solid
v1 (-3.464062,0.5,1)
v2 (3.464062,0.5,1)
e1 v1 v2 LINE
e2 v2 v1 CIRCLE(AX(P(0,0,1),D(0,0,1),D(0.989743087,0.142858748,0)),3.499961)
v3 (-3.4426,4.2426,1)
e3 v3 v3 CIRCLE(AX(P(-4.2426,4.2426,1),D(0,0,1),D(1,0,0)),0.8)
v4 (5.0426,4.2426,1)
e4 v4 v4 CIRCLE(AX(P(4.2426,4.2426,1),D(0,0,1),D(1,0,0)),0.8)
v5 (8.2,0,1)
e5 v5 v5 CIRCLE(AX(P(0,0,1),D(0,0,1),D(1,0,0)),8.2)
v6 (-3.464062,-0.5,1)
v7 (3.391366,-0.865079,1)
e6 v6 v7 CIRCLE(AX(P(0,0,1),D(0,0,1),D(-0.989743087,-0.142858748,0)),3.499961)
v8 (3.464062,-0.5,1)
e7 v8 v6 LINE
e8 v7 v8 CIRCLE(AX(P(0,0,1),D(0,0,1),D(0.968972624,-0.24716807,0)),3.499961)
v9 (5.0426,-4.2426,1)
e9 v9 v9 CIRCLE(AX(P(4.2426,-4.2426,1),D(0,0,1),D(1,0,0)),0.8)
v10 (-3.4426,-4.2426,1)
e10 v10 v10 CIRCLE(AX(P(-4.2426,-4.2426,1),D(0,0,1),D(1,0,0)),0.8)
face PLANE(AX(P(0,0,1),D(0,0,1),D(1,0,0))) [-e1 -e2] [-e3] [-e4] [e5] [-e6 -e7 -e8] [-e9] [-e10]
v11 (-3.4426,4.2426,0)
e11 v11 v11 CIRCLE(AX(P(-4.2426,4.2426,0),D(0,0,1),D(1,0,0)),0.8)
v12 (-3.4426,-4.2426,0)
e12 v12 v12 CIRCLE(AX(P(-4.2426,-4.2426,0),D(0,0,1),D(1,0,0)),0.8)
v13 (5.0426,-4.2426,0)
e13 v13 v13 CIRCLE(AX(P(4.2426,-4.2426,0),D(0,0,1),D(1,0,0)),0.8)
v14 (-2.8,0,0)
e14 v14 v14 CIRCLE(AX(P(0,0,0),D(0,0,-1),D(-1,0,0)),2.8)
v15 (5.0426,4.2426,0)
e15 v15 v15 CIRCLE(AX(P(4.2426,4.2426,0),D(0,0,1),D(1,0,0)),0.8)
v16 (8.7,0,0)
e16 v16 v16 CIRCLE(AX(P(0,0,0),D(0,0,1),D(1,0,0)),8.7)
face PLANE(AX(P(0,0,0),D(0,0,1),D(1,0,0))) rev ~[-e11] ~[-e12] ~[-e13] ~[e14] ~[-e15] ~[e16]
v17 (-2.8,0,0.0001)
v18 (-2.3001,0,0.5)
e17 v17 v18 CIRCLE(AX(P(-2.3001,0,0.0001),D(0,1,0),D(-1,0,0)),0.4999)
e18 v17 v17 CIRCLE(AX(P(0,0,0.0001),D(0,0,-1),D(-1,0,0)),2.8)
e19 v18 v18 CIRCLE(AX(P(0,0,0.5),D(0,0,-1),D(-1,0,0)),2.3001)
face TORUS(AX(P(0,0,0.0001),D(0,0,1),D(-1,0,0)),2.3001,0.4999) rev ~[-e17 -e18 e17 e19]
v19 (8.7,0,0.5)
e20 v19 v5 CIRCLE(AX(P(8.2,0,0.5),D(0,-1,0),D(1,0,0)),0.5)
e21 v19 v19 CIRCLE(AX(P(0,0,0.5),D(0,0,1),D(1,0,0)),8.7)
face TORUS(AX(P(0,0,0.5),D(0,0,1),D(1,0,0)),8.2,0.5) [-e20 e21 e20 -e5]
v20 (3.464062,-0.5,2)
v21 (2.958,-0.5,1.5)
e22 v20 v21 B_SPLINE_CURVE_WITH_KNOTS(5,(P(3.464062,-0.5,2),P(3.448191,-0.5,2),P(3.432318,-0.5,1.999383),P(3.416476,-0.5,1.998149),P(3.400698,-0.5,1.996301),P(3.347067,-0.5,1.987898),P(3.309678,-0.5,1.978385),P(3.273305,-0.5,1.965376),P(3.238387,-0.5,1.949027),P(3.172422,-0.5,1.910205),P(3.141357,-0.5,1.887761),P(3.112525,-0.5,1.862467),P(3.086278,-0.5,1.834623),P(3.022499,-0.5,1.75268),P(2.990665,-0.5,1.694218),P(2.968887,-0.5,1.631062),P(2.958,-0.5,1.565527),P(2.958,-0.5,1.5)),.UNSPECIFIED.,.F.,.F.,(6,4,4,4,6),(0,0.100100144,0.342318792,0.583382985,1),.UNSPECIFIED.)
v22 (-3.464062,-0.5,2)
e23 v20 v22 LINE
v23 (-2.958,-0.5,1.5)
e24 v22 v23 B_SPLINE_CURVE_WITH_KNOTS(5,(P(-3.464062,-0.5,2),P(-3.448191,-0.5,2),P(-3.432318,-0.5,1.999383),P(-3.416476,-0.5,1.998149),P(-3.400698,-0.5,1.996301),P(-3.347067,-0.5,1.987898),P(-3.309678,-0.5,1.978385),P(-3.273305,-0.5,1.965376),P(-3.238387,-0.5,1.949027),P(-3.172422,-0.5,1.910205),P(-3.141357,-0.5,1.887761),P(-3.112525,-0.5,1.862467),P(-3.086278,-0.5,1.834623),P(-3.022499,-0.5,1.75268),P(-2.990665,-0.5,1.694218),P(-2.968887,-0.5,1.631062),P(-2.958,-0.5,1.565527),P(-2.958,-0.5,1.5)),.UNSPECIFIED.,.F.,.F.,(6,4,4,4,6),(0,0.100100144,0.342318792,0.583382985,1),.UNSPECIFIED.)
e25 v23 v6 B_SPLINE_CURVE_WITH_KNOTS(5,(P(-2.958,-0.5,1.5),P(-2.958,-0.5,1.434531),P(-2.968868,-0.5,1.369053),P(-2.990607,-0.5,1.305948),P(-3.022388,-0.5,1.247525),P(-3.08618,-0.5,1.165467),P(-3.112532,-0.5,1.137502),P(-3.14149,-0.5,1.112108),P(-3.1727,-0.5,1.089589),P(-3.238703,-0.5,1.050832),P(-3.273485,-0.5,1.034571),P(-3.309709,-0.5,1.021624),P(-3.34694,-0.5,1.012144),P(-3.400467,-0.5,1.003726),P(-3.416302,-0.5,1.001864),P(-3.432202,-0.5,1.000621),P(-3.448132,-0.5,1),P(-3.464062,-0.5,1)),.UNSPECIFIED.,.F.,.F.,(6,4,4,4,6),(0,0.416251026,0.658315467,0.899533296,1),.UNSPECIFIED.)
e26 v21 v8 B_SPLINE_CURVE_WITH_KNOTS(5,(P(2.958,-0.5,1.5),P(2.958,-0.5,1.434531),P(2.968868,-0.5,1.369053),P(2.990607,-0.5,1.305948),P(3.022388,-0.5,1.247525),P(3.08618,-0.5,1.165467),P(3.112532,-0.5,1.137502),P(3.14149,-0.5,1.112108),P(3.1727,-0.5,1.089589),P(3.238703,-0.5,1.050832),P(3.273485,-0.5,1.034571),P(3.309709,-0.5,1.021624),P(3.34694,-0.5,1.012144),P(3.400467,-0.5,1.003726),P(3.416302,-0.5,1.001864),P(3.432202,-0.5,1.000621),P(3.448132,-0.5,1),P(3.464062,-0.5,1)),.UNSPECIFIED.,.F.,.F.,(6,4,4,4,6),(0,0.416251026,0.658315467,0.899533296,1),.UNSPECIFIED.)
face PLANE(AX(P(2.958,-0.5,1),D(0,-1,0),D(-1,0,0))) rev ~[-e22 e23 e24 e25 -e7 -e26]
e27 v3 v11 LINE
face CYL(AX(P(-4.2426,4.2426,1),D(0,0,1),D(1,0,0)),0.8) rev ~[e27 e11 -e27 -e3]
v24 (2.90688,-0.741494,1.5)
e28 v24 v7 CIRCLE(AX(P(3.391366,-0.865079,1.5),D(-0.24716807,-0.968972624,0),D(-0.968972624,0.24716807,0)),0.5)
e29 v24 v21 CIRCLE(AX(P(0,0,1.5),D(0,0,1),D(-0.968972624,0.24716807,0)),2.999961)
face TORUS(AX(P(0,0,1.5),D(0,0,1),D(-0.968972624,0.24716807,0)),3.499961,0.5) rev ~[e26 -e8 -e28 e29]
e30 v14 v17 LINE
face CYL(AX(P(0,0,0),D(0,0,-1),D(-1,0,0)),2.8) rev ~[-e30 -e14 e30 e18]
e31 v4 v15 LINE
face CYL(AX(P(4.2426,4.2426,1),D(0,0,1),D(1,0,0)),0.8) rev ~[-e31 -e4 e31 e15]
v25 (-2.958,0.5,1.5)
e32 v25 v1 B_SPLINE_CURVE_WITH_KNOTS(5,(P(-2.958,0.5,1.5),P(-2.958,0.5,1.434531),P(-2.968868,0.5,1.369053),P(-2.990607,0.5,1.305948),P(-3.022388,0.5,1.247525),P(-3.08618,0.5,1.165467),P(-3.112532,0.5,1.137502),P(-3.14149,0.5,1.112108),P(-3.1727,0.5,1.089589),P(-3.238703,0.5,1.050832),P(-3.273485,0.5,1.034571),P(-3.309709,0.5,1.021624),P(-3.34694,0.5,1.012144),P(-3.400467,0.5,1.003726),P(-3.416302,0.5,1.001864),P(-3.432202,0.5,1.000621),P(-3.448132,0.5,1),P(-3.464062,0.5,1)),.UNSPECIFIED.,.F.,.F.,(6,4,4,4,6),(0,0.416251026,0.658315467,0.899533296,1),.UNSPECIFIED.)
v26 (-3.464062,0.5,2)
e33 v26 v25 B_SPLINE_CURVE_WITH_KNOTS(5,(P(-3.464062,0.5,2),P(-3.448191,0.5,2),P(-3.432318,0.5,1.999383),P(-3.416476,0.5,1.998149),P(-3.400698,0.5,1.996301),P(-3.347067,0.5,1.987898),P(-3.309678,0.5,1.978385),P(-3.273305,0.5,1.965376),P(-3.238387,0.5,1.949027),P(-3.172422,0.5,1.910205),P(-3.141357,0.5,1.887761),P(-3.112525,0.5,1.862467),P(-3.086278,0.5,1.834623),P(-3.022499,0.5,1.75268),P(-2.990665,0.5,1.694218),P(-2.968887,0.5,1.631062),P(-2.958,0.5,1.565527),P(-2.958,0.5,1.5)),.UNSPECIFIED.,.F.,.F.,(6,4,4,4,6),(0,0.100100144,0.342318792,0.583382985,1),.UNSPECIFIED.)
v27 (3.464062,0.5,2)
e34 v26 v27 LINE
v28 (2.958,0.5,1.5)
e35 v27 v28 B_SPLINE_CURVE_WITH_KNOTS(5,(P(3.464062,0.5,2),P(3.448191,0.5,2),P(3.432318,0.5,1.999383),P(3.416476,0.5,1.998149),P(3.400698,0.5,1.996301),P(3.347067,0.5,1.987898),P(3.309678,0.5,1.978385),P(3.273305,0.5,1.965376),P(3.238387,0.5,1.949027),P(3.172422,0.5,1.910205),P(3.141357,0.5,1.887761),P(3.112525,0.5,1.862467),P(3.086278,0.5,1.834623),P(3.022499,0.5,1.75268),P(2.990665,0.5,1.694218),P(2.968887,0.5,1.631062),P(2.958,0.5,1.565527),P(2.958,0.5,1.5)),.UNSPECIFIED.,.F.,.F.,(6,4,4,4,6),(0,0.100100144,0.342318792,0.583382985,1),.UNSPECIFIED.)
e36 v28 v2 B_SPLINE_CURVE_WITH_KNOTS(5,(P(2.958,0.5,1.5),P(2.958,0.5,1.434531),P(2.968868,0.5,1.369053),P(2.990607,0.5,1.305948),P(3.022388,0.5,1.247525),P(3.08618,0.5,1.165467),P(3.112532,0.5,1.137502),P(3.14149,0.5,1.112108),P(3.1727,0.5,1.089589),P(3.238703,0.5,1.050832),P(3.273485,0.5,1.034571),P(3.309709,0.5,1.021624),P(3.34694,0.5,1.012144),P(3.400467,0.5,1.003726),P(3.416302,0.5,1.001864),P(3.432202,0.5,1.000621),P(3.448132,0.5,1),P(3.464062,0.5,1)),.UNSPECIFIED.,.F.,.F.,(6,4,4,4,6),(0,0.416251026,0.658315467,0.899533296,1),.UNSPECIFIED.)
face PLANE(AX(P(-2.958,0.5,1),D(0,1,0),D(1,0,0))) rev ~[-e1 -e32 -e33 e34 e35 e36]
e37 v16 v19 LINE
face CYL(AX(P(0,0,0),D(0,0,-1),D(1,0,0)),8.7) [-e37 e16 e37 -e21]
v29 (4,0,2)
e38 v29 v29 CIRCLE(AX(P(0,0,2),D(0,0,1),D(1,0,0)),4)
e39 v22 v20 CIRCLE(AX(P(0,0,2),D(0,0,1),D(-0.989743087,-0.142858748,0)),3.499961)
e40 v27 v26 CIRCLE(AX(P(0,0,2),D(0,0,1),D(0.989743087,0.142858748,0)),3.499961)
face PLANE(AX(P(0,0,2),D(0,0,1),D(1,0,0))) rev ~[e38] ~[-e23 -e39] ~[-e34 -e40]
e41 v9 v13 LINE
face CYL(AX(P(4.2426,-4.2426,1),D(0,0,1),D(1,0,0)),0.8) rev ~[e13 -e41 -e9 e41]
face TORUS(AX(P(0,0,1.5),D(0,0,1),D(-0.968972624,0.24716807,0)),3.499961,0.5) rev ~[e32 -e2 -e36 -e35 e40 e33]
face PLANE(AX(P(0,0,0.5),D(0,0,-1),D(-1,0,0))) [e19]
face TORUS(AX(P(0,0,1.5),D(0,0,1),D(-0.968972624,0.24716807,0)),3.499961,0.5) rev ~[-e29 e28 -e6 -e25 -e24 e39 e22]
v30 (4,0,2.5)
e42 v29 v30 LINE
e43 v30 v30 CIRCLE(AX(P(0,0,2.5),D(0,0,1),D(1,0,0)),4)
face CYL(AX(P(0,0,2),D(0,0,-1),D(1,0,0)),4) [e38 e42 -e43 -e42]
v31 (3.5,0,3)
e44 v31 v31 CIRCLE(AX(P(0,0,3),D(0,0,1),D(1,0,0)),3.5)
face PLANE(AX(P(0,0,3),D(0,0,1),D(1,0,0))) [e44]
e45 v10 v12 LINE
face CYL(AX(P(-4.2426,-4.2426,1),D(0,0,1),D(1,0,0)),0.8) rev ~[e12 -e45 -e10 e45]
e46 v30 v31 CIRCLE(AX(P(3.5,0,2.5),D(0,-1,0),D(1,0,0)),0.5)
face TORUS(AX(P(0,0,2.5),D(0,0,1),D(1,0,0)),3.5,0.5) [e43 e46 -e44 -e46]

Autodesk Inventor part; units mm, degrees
ref_plane "YZ Plane" through (0, 0, 0) normal (1, 0, 0) x (0, 1, 0)
ref_plane "XZ Plane" through (0, 0, 0) normal (0, 1, 0) x (-1, 0, 0)
ref_plane "XY Plane" through (0, 0, 0) normal (0, 0, 1) x (1, 0, 0)
sketch "Sketch1" plane through (0, 0, 0) normal (0, 0, 1) x (1, 0, 0)
  circle A0 centre (0, 0) radius 8.7
  dimension "d0" = 17.4
extrude "Extrusion1" add sketch "Sketch1" along normal blind 1
sketch "Sketch2" plane through (0, 0, 1) normal (0, 0, 1) x (1, 0, 0)
  circle A0 centre (4.2426, 4.2426) radius 0.8
  circle A1 centre (-4.2426, 4.2426) radius 0.8
  circle A2 centre (-4.2426, -4.2426) radius 0.8
  circle A3 centre (4.2426, -4.2426) radius 0.8
  dimension "d9" = 1.6
  dimension "d10" = 1.6
  dimension "d11" = 1.6
  dimension "d12" = 1.6
extrude "Extrusion2" cut sketch "Sketch2" against normal up to next
sketch "Sketch3" plane through (0, 0, 0) normal (0, 0, -1) x (-1, 0, 0)
  circle A0 centre (0, 0) radius 2.8
  dimension "d15" = 5.6
extrude "Extrusion3" cut sketch "Sketch3" against normal blind 0.5
fillet "Fillet1" radius 0.5 1 edges at (2.8, 0, 0.5)
fillet "Fillet4" radius 0.5 1 edges at (-8.7, 0, 1)
sketch "Sketch7" plane through (0, 0, 1) normal (0, 0, 1) x (1, 0, 0)
  line L0 (-2.958, 0.5) -> (2.958, 0.5)
  line L1 (2.958, -0.5) -> (-2.958, -0.5)
  arc A0 (2.958, 0.5) -> (-2.958, 0.5) centre (0, 0) ccw
  arc A1 (-2.958, -0.5) -> (2.958, -0.5) centre (0, 0) ccw
  point P0 (0, 0)
extrude "Extrusion7" add sketch "Sketch7" along normal blind 1
sketch "Sketch8" plane through (0, 0, 2) normal (0, 0, 1) x (1, 0, 0)
  circle A0 centre (0, 0) radius 4
  dimension "d38" = 8
extrude "Extrusion8" add sketch "Sketch8" along normal blind 1
fillet "Fillet5" radius 0.5 4 edges at (0, -3, 2) (0, 3, 2) (0, 3, 1) (0, -3, 1)
fillet "Fillet6" radius 0.5 1 edges at (-4, 0, 3)
properties part number "pulley"
